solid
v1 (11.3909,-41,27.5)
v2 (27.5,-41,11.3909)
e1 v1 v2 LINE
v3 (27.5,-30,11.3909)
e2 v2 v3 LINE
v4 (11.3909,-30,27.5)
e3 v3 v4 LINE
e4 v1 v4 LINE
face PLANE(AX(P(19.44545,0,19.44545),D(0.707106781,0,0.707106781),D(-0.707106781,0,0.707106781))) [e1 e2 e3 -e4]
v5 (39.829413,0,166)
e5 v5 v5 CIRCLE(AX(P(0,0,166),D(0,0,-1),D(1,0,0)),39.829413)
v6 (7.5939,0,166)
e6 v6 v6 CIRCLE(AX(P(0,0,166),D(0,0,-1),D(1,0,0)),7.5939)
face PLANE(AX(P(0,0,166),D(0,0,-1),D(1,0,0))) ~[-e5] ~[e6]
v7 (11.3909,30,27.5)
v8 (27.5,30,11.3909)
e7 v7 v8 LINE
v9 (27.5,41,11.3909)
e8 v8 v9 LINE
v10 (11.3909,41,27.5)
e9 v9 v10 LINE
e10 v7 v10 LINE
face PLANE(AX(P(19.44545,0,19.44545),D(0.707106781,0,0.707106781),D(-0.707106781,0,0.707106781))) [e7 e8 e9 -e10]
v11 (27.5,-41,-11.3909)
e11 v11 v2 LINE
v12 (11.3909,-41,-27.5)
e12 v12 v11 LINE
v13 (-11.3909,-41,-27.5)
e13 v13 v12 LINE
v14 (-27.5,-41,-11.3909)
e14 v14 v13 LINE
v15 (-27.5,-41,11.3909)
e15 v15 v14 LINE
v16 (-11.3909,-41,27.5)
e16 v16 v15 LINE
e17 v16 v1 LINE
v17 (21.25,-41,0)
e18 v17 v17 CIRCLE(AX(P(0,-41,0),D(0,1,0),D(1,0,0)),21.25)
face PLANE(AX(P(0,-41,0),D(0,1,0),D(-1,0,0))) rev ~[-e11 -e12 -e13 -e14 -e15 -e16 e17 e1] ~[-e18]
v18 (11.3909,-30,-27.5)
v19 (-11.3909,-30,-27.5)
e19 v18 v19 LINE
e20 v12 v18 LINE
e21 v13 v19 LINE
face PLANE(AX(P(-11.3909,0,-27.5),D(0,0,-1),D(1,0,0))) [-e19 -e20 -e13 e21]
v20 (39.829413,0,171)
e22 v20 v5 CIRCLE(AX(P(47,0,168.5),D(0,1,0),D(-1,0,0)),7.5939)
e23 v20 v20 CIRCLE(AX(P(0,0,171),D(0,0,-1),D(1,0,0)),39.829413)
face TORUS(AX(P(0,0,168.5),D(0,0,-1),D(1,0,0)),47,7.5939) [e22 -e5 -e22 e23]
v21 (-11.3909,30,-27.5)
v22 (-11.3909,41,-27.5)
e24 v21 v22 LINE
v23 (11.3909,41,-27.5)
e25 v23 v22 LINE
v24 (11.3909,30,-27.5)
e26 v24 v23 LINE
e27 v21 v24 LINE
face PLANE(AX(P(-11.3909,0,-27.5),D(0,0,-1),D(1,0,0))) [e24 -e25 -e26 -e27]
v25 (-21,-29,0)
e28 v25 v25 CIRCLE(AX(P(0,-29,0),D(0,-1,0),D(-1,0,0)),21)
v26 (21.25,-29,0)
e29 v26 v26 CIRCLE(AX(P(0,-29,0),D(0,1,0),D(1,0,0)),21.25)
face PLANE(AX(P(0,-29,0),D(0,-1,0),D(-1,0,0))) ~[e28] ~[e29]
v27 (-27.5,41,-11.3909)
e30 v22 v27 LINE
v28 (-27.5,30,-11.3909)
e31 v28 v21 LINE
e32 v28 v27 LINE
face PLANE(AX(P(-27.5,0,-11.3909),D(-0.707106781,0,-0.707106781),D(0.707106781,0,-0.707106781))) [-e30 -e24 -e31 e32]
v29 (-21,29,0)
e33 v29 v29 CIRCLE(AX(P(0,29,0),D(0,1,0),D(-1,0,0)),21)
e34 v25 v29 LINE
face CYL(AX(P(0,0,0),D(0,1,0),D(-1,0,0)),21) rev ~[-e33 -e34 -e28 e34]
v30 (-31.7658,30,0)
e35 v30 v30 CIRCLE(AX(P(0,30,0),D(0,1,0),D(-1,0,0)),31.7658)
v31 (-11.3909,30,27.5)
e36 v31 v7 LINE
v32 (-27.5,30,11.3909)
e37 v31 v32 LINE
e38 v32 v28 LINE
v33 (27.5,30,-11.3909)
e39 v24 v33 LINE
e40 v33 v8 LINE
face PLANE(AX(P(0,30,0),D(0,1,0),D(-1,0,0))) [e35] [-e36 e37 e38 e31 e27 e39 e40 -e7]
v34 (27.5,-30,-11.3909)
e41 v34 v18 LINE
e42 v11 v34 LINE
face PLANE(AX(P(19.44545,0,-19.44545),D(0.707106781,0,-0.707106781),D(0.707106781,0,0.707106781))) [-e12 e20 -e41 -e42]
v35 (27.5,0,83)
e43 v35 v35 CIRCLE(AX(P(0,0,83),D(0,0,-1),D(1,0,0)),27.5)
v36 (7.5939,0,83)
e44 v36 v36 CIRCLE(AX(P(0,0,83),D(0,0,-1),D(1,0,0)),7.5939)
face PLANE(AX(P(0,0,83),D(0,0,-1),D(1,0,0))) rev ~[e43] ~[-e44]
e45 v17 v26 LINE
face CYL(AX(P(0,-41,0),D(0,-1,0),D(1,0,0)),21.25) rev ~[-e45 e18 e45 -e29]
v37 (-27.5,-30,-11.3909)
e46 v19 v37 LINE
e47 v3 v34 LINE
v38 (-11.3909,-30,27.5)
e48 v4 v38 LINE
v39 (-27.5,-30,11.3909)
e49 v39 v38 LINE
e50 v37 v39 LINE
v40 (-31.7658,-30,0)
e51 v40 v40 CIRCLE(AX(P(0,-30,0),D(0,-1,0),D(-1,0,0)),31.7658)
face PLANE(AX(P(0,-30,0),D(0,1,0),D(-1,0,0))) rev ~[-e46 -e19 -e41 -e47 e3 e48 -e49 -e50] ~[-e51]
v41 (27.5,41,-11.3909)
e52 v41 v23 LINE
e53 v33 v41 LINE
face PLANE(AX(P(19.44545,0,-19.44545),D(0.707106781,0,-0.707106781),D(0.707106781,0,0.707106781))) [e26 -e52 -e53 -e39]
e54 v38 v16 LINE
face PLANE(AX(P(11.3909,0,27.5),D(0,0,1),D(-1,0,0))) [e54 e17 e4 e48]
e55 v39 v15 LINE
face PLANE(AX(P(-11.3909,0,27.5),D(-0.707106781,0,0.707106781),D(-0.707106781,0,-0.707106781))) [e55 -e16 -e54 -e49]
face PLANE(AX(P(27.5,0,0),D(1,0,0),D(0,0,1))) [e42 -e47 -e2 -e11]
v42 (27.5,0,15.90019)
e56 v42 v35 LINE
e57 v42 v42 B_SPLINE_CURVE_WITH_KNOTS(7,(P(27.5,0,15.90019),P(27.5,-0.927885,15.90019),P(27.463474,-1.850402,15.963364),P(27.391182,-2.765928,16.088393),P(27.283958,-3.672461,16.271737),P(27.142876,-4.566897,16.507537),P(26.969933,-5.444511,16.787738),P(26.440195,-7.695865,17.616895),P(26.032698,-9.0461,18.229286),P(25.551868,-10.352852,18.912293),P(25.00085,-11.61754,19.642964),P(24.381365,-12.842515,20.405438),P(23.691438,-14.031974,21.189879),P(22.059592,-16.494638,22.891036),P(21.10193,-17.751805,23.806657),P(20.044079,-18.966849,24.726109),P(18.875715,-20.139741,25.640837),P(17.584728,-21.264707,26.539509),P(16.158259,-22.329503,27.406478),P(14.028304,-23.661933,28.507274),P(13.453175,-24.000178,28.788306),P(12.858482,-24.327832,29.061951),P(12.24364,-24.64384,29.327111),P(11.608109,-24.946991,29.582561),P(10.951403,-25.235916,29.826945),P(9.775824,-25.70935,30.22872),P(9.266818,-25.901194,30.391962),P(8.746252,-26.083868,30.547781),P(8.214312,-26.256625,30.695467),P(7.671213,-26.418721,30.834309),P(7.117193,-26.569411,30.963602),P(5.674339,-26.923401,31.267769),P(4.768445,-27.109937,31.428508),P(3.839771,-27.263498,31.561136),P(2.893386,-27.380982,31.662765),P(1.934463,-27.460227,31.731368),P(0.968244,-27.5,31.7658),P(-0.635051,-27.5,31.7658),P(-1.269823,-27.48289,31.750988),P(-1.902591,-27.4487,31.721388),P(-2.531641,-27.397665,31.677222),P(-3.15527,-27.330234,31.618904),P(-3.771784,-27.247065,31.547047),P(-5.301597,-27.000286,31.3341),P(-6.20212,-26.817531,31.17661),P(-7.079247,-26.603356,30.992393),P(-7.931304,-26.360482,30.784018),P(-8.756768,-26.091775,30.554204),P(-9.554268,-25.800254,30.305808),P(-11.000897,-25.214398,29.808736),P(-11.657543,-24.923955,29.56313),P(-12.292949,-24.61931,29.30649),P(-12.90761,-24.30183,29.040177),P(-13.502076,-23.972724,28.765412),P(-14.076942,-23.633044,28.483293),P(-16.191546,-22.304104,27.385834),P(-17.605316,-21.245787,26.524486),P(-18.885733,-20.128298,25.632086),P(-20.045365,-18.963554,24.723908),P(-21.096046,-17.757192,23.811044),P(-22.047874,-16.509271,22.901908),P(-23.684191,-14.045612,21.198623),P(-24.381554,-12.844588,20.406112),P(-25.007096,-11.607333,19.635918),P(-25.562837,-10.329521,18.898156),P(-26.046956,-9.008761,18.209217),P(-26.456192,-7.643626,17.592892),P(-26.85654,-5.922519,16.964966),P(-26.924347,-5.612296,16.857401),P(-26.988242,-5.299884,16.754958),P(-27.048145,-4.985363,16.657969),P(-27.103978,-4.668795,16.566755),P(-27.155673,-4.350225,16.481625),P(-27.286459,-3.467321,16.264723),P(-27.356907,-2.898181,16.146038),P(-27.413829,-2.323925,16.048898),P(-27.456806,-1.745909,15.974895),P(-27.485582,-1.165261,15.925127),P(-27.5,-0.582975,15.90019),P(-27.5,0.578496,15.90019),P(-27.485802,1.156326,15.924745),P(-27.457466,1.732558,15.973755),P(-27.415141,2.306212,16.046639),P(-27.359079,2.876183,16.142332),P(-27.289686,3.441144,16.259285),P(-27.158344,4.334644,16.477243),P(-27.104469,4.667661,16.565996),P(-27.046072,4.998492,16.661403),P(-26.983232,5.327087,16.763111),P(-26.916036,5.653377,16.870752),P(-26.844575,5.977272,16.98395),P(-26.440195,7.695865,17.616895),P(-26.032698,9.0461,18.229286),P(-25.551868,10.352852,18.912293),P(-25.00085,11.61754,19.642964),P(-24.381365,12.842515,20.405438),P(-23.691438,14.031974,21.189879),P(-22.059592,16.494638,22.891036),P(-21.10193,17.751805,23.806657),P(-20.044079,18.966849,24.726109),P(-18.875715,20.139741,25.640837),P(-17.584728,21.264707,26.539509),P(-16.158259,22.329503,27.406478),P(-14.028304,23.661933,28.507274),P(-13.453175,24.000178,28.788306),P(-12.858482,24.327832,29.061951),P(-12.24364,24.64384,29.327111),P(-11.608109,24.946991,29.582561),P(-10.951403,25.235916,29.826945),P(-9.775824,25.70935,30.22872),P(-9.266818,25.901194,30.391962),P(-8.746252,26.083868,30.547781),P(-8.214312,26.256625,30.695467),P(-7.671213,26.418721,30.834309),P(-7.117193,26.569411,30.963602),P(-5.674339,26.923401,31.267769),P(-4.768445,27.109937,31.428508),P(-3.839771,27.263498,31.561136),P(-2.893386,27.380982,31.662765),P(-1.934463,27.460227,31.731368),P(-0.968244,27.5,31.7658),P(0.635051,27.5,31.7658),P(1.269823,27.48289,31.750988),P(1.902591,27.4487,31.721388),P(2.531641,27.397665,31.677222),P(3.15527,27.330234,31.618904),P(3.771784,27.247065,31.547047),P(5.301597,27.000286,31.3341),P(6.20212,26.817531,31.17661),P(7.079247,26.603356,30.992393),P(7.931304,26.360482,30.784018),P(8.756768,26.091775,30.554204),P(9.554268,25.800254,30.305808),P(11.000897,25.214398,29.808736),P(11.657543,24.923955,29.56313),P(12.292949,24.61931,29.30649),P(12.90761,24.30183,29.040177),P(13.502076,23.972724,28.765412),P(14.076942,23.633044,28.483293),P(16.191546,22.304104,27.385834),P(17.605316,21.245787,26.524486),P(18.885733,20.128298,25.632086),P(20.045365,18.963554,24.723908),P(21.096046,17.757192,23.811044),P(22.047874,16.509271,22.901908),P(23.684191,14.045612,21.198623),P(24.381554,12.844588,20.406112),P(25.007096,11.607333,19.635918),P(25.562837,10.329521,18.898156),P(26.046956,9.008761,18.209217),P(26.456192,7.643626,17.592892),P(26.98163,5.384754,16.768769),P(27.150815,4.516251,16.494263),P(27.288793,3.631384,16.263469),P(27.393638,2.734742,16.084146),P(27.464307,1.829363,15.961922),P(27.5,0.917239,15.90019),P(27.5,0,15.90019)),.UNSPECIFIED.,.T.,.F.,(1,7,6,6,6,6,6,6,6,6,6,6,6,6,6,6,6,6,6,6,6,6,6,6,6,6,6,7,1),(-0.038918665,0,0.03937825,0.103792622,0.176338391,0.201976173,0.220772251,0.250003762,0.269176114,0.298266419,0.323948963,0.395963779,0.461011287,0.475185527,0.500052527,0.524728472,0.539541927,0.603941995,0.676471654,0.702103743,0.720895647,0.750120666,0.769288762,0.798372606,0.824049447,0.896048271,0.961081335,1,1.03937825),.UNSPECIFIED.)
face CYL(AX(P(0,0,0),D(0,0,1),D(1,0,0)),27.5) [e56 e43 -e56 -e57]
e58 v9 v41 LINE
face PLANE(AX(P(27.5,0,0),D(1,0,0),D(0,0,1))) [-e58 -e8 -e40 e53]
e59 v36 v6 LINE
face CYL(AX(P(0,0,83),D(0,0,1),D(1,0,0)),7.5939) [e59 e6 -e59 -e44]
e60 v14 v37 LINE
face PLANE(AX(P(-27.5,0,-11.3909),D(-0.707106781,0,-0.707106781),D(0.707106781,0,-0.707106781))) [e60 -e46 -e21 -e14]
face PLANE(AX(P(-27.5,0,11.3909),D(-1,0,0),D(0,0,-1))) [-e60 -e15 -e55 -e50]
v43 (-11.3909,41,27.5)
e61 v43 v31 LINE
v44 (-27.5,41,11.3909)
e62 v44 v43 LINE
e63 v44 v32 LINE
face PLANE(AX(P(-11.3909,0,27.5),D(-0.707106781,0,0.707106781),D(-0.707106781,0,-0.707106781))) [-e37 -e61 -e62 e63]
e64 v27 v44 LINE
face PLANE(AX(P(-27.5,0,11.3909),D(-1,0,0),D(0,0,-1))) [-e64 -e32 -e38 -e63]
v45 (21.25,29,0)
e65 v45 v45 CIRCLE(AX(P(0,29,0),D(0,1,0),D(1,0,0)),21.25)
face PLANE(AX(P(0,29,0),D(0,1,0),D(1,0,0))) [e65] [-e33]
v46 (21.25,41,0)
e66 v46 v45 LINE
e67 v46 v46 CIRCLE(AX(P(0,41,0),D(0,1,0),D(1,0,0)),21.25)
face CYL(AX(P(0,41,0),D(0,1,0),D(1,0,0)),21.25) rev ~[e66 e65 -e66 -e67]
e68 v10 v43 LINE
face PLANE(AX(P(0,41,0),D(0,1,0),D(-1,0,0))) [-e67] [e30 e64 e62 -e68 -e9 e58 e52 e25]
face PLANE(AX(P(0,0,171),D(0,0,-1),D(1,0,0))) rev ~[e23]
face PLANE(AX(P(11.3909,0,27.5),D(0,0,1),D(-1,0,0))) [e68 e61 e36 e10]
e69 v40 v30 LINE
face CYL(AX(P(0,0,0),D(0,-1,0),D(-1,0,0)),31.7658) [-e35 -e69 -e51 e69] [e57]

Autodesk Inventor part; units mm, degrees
ref_plane "YZ Plane" through (0, 0, 0) normal (1, 0, 0) x (0, 1, 0)
ref_plane "XZ Plane" through (0, 0, 0) normal (0, 1, 0) x (-1, 0, 0)
ref_plane "XY Plane" through (0, 0, 0) normal (0, 0, 1) x (1, 0, 0)
sketch "Sketch3" plane through (0, 0, 0) normal (0, 1, 0) x (-1, 0, 0)
  line L0 (-11.3909, 27.5) -> (11.3909, 27.5)
  line L1 (11.3909, 27.5) -> (27.5, 11.3909)
  line L2 (27.5, 11.3909) -> (27.5, -11.3909)
  line L3 (27.5, -11.3909) -> (11.3909, -27.5)
  line L4 (11.3909, -27.5) -> (-11.3909, -27.5)
  line L5 (-11.3909, -27.5) -> (-27.5, -11.3909)
  line L6 (-27.5, -11.3909) -> (-27.5, 11.3909)
  line L7 (-27.5, 11.3909) -> (-11.3909, 27.5)
  circle A0 centre (0, 0) radius 29.7658
  circle A1 centre (0, 0) radius 27.5
  circle A2 centre (0, 0) radius 21
  circle A3 centre (0, 0) radius 31.7658
  line L8 (0, 0) -> (-27.5, 0)
  line L9 (-27.5, 0) -> (-27.5, 83)
  line L10 (-27.5, 83) -> (0, 83)
  line L11 (0, 83) -> (0, 0)
  line L12 (0, 83) -> (-7.5939, 83)
  line L13 (-7.5939, 83) -> (-7.5939, 166)
  line L14 (-7.5939, 166) -> (0, 166)
  line L15 (0, 166) -> (0, 83)
  line L16 (0, 166) -> (-47, 166)
  line L17 (-47, 166) -> (-47, 171)
  line L18 (-47, 171) -> (0, 171)
  line L19 (0, 171) -> (0, 166)
  circle A4 centre (-47, 168.5) radius 7.5939
  dimension "oSW" = 55
  dimension "oIntDia" = 42
  dimension "d16" = 2
  dimension "oWheelDia" = 94
  dimension "d51" = 5
  dimension "d52" = 15.1878
  dimension "oStemHeight" = 171
  dimension "d57" = 15.1878
  dimension "d58" = 22.7817
revolve "Revolution1" add sketch "Sketch3" angle 360 about axis through (0, 0, 166) along (0, 0, -1) picked at (-6.365, 27.9172) picked at (-16.0373, 26.4927) picked at (-1.7883, 25.1572) picked at (-13.8245, 1.5576) contours A0 L11 L0 | L0 A1 L7 | L7 A0 | A0 L9 A3 L11 | L11 A2 L8 A1 | A1 L6 L7 | L11 L8 A2 | L9 L10 L11 A3 | L10 L13 L14 L15 | L14 L16 A4 L18 L19 | A4 L18 L17 L16 | L16 L17 L18 A4
extrude "Extrusion1" add sketch "Sketch3" along normal mid plane 82 separate body contours L0 A1 L7 | L0 L1 A1 | L11 A2 L8 A1 | A1 L8 A2 L11 | A1 L6 L7 | L1 L2 A1 | A1 L5 L6 | L2 L3 A1 | A1 L4 L5 | L3 L4 A1
extrude "Extrusion12" cut sketch "Sketch3" along normal through all both and the other way through all contours L11 L8 A2 | A2 L8 L11
extrude "Extrusion2" add sketch "Sketch3" along normal mid plane 60 contours A0 L11 L0 | L7 A0 | A0 L9 A3 L11 | L11 A0 L0 | L6 A0 | A0 L11 A3 L9 | A0 L1 | L5 A0 | A0 L2 | L4 A0 | A0 L3
sketch "Sketch10" plane through (0, 41, 0) normal (0, 1, 0) x (1, 0, 0)
  circle A0 centre (0, 0) radius 21 projected
  circle A1 centre (0, 0) radius 21.25
  dimension "d44" = 0.25
extrude "Extrusion11" cut sketch "Sketch10" against normal blind 12
mirror "Mirror1" about plane through (0, 0, 0) normal (0, 1, 0) of "Extrusion11"
equation "\"d52\" = 0.666667 * d58"
equation "\"d57\" = d52"
properties part number "Manual Threaded Ball Valve DN40 S235" material "S235"
